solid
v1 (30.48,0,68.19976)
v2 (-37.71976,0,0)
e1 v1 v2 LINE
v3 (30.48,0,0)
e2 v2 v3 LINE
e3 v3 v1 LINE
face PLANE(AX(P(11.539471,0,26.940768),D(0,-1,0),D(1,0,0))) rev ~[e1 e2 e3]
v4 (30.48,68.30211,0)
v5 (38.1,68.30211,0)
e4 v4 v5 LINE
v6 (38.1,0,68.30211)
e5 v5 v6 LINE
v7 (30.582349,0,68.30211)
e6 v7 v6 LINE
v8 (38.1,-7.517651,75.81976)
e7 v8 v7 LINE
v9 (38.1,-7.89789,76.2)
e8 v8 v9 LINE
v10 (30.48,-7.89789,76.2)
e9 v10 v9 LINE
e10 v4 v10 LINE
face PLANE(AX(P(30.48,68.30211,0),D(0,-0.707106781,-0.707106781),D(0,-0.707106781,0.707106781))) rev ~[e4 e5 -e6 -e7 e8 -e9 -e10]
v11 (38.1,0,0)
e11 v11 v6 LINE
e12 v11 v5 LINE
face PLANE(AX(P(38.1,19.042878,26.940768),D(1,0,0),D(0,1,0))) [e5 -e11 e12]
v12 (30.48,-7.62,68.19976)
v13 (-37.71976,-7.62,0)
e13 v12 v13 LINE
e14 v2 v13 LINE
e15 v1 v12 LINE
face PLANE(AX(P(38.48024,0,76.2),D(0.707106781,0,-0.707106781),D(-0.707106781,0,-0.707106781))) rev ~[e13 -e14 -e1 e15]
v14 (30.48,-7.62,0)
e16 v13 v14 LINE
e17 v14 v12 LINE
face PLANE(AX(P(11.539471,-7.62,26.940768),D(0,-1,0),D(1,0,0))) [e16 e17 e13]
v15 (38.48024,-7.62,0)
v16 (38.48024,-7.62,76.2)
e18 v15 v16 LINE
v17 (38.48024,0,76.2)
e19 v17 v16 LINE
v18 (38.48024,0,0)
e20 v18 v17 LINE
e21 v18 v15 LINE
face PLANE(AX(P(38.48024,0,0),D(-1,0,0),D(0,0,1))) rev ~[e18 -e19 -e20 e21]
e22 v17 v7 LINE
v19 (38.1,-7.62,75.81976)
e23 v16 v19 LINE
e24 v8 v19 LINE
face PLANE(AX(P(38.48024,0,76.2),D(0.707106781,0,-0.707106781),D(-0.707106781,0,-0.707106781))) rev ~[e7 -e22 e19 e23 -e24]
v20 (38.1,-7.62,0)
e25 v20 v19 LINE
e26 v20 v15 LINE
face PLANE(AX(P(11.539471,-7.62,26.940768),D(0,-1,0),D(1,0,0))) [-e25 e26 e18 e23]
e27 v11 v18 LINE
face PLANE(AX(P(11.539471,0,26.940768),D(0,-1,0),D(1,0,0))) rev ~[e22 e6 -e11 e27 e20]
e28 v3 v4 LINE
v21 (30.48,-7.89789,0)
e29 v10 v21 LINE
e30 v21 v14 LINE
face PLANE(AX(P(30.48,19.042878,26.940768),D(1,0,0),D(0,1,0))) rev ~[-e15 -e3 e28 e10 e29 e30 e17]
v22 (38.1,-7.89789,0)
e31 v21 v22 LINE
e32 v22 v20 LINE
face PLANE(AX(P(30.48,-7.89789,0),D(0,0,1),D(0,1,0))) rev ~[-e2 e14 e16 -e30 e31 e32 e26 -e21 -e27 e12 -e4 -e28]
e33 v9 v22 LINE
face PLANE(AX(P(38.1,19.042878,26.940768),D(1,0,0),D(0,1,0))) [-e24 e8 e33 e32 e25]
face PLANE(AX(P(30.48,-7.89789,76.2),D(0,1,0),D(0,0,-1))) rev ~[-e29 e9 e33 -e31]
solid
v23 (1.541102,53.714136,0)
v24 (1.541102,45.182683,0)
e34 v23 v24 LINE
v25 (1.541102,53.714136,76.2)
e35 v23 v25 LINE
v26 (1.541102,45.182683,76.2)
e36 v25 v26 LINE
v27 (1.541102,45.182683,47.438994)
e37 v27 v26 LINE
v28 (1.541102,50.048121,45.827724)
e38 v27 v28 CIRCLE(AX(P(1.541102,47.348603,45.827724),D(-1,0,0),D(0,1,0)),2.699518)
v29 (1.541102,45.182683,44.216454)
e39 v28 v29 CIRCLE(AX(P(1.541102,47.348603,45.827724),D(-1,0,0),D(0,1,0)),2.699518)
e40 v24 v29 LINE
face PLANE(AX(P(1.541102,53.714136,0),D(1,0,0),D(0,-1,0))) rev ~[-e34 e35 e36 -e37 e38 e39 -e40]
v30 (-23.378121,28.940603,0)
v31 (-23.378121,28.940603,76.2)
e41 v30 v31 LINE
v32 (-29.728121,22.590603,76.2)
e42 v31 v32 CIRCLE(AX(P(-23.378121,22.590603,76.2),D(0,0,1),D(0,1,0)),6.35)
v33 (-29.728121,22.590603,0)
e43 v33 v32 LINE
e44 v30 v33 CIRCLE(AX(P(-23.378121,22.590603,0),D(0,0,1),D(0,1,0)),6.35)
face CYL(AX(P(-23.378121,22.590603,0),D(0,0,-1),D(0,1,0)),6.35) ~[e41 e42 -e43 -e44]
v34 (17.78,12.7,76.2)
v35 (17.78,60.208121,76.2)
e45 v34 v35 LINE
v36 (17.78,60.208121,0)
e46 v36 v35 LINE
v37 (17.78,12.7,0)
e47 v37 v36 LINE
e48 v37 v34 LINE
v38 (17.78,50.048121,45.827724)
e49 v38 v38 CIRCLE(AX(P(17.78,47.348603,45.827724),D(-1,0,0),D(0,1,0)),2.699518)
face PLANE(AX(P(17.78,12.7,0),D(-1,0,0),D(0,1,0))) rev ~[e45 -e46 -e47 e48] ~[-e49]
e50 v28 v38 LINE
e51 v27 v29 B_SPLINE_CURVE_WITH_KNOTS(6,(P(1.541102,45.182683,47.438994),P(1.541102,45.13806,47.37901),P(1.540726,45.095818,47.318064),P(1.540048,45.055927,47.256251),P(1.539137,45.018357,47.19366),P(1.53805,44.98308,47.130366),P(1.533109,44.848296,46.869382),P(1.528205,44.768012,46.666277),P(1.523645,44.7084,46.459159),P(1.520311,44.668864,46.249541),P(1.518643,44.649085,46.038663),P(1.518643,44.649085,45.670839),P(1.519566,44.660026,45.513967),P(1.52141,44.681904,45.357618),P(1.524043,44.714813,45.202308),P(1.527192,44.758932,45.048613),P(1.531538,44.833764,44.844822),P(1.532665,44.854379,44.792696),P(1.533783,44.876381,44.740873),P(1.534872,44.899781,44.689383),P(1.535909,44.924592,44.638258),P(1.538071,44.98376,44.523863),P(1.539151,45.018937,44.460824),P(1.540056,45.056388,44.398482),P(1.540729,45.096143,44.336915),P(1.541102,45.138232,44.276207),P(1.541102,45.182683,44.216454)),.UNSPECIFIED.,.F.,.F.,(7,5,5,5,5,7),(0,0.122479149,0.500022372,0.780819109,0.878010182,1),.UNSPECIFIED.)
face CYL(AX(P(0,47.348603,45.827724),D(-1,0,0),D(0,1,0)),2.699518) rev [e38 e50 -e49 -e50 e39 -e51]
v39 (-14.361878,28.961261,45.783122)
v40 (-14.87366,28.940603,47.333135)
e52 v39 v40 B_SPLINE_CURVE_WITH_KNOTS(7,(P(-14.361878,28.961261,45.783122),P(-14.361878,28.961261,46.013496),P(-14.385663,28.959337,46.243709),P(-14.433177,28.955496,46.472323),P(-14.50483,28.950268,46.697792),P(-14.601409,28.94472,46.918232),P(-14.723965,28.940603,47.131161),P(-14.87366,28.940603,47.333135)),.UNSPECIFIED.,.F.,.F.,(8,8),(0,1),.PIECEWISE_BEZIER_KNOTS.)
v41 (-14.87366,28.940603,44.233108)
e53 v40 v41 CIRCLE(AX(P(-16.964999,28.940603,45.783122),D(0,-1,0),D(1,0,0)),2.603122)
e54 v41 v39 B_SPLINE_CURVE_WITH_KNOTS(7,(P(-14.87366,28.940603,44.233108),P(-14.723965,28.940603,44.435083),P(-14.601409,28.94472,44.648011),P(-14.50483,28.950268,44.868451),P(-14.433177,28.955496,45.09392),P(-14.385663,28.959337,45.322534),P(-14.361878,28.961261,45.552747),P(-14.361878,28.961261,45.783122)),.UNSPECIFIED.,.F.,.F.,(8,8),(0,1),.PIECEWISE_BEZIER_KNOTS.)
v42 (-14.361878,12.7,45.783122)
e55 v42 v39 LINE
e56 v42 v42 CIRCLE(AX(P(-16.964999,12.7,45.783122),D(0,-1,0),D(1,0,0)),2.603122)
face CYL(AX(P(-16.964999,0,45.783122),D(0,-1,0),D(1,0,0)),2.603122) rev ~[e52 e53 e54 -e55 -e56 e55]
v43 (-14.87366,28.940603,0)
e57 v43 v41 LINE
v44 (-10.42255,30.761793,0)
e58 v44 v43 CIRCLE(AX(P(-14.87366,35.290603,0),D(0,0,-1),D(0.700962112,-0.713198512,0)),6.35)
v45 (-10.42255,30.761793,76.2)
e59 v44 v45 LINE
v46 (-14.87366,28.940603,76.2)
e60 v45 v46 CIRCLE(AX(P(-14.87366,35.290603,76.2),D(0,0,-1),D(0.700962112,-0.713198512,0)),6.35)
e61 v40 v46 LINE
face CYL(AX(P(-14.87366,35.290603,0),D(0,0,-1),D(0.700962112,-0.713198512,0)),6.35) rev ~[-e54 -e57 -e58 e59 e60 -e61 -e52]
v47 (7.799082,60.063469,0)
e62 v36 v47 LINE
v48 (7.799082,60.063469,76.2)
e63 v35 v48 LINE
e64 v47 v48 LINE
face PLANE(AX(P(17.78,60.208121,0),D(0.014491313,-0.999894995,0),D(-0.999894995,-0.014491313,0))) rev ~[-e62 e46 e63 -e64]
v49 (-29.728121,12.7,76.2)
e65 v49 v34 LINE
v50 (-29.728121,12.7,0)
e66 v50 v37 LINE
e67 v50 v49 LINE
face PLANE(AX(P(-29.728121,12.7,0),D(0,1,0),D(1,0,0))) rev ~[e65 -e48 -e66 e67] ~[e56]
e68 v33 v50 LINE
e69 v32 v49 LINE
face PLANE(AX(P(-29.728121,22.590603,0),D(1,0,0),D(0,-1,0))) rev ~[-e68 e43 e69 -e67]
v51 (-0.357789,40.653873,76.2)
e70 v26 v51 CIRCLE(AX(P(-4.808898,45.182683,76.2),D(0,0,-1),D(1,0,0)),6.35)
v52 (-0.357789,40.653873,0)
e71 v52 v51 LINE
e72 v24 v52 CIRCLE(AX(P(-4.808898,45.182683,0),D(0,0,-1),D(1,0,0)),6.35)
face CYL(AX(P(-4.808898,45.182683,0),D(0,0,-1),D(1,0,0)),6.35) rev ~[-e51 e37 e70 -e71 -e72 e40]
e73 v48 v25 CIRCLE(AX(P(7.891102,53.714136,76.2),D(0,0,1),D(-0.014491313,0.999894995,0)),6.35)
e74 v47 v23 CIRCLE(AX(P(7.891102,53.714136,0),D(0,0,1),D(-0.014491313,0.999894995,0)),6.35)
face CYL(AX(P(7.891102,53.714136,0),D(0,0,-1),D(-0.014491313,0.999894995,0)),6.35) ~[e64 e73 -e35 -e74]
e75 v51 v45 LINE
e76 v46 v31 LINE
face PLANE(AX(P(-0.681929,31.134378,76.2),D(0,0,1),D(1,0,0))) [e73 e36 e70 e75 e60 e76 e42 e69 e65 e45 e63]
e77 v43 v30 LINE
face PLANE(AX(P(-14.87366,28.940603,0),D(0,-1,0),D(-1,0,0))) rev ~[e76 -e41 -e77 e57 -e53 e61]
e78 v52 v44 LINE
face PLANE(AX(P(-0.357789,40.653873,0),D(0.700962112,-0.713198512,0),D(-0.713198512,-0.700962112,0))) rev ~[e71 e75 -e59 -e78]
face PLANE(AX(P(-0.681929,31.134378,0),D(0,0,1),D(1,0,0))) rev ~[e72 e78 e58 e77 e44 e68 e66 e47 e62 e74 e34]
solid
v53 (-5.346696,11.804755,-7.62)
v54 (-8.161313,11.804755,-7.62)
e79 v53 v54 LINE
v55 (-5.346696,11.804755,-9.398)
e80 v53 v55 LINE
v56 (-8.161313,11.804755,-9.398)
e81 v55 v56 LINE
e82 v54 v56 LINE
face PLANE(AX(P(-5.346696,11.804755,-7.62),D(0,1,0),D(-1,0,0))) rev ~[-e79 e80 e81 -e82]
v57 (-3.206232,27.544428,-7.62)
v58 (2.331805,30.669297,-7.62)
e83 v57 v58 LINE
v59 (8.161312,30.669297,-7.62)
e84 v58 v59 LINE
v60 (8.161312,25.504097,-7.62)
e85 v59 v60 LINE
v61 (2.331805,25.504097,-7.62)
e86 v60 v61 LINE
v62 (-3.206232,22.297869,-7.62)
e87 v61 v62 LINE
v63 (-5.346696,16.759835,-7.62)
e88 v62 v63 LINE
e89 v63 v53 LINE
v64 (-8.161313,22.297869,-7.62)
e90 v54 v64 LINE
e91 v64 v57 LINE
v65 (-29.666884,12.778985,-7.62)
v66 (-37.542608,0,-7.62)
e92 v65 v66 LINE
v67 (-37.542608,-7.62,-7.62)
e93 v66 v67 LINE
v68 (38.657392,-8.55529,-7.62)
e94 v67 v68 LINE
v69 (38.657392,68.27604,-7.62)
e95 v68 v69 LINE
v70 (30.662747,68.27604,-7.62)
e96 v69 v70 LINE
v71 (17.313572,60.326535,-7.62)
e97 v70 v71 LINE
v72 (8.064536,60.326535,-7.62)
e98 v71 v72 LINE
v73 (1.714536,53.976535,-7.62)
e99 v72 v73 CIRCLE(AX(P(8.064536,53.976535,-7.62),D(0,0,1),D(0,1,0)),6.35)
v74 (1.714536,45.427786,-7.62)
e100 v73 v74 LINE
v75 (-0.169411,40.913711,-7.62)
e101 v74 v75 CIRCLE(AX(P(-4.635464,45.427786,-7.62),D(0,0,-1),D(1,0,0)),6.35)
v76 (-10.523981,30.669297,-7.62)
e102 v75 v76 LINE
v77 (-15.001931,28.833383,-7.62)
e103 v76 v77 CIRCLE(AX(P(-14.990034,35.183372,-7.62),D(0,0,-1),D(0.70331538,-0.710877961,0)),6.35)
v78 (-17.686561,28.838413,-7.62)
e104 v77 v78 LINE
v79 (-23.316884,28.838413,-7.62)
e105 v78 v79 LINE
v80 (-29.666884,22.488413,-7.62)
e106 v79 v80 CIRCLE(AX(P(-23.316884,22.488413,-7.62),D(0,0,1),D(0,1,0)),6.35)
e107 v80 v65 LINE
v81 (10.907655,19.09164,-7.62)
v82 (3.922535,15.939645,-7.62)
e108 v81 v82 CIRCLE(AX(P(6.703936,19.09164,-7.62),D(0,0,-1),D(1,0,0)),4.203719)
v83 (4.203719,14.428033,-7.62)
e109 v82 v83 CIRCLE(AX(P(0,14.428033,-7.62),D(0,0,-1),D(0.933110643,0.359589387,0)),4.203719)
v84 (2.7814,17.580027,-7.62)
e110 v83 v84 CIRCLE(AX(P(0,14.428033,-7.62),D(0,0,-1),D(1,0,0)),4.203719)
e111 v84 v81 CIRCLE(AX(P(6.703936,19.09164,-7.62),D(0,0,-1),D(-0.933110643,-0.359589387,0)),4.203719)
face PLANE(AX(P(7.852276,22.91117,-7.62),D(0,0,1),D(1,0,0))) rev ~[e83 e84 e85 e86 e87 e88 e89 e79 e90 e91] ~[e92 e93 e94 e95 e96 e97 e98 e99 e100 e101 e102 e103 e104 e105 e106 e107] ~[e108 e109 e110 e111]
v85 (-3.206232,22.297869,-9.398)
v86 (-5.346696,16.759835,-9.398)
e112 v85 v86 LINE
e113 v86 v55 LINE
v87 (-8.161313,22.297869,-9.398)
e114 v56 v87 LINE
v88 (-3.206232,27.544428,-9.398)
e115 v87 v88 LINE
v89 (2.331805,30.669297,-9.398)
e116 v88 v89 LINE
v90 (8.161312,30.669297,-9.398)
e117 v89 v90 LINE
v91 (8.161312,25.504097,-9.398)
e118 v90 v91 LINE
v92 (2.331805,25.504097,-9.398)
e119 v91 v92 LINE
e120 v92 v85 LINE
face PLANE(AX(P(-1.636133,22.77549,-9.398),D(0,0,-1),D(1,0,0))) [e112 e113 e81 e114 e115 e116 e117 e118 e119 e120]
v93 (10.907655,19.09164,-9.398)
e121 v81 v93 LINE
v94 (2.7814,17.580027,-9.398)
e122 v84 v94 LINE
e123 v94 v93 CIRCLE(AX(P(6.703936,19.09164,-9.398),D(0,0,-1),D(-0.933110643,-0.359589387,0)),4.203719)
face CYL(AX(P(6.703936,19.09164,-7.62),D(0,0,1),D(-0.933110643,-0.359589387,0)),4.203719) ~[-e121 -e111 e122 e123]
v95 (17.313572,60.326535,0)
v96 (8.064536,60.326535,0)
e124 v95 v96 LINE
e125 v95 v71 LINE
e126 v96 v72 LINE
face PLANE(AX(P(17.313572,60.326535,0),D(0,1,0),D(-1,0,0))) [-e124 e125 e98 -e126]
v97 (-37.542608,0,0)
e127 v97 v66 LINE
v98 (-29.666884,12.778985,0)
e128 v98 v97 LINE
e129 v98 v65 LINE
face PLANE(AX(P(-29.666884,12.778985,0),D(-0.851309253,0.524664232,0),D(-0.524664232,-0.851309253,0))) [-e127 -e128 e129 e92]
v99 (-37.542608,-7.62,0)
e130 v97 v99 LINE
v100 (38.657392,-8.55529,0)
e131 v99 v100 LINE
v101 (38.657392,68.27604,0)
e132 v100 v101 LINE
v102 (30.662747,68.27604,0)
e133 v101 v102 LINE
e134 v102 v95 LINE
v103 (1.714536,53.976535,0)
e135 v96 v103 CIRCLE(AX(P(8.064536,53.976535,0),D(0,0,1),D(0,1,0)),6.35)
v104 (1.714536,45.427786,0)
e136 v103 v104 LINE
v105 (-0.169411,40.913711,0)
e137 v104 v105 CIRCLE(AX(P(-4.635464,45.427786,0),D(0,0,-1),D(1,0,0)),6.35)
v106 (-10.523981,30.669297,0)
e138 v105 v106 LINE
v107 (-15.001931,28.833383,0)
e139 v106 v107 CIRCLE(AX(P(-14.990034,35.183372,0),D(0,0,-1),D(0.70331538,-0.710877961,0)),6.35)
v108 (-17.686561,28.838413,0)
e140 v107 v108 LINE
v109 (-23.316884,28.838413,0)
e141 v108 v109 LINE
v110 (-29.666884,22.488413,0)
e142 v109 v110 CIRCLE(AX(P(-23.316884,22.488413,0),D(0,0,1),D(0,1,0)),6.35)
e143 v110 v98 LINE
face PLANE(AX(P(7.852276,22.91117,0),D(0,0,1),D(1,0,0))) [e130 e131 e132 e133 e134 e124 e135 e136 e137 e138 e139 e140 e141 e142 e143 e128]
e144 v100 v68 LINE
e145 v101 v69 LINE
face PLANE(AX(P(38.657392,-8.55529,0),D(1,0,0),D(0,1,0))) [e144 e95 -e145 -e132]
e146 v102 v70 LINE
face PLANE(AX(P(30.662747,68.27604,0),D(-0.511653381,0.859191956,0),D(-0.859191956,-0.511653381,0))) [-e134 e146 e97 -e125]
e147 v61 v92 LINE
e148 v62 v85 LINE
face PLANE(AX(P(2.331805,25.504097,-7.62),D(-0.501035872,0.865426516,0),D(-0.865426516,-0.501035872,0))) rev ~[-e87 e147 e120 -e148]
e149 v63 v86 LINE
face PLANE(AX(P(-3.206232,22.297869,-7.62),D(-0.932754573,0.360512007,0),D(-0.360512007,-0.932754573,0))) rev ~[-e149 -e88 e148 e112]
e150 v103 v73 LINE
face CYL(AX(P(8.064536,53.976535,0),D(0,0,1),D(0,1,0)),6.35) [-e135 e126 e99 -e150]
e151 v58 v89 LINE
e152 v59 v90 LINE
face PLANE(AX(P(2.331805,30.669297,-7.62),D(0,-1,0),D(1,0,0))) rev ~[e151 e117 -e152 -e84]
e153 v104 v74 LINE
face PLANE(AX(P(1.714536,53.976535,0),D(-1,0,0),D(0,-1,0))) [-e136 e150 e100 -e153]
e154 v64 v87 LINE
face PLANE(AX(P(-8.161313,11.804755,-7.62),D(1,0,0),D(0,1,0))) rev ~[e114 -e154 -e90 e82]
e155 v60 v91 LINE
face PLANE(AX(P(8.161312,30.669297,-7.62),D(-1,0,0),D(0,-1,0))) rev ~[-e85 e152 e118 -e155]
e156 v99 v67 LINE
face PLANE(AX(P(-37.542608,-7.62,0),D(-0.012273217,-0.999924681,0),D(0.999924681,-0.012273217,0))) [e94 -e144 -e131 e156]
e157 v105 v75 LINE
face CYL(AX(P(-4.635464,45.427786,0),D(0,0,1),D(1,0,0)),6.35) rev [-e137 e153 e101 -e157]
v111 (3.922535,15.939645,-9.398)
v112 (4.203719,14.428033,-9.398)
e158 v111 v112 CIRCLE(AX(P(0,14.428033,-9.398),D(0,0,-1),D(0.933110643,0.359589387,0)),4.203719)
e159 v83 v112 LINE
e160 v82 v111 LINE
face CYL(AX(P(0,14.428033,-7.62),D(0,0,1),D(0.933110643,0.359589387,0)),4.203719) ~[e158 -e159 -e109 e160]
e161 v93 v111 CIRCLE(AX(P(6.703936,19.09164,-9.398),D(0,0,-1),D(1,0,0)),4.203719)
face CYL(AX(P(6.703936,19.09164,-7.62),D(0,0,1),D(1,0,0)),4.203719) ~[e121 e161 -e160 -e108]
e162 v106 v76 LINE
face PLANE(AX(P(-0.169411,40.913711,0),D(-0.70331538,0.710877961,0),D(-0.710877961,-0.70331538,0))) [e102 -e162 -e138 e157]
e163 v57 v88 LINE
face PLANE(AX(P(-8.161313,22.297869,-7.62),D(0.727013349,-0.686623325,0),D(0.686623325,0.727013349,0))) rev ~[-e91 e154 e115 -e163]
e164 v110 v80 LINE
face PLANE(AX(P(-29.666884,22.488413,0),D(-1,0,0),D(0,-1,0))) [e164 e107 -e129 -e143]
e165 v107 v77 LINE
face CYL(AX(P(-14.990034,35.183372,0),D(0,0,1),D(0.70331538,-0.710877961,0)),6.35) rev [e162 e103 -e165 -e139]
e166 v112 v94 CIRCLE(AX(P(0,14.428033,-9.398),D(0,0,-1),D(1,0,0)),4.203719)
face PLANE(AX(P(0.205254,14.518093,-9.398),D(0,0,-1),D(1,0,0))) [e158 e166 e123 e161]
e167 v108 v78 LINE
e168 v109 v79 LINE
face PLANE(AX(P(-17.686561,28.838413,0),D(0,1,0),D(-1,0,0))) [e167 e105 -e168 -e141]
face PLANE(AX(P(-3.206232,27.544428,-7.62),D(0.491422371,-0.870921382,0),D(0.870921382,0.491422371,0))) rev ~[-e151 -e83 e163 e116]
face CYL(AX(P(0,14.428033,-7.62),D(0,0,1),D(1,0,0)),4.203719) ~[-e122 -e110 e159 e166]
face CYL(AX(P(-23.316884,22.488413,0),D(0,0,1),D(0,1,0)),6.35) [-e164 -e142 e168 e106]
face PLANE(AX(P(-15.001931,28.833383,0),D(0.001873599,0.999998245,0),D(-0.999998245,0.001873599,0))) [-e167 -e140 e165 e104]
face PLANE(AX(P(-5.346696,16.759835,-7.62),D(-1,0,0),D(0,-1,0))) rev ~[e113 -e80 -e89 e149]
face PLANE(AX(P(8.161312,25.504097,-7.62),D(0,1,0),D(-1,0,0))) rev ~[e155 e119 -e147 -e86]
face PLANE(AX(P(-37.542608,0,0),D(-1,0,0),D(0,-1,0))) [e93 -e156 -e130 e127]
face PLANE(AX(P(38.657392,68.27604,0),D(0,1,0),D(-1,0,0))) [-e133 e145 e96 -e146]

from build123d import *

# Parameters (mm, degrees)
F1_DEPTH       = 7.62
F3_START       = 30.48
F3_DEPTH       = 7.62
F5_DEPTH       = 76.2
F7_DEPTH       = 7.62
F8_R           = 2.6031217073
F9_DEPTH       = 98.806
F10_R          = 2.6995181892
F11_DEPTH      = 47.752
F11_DEPTH_BACK = 45.212
F13_DEPTH      = 1.778


# Not quite as in the source:
# - a feature names something its author has since deleted; it is built from what else it names


with BuildPart() as f1:
    # F0 (on Front) → F1 (new body)
    with BuildSketch(Plane.XZ):
        Polygon((38.4802398158, 76.2), (-37.7197601842, 0), (38.4802398158, 0), align=None)
    extrude(amount=F1_DEPTH)

    # F2 (on Right) → F3 (join)
    with BuildSketch(Plane.YZ.offset(F3_START)):
        Polygon((68.3021095197, 0), (-7.8978904803, 76.2), (-7.8978904803, 0), align=None)
    extrude(amount=F3_DEPTH)


with BuildPart() as f5:
    # F4 (on Top) → F5 (new body)
    with BuildSketch(Plane.XY):
        with BuildLine():
            Line((17.78, 12.7), (17.78, 60.2081210786))
            Line((17.78, 60.2081210786), (7.7990821899, 60.0634692811))
            ThreePointArc((7.7990821899, 60.0634692811), (3.3685570616, 58.1716114676), (1.5411020302, 53.7141360603))
            Line((1.5411020302, 53.7141360603), (1.5411020302, 45.1826832225))
            ThreePointArc((1.5411020302, 45.1826832225), (1.047169173, 42.7272855726), (-0.3577885585, 40.6538726713))
            Line((-0.3577885585, 40.6538726713), (-10.4225503406, 30.7617927566))
            ThreePointArc((-10.4225503406, 30.7617927566), (-12.4690232929, 29.4135101913), (-14.8736597519, 28.9406033078))
            Line((-14.8736597519, 28.9406033078), (-23.3781210786, 28.9406033078))
            ThreePointArc((-23.3781210786, 28.9406033078), (-27.8682491391, 27.0807313683), (-29.7281210786, 22.5906033078))
            Line((-29.7281210786, 22.5906033078), (-29.7281210786, 12.7))
            Line((-29.7281210786, 12.7), (17.78, 12.7))
        make_face()
    extrude(amount=F5_DEPTH)

    # F8 (on Front) → F9 (cut)
    with BuildSketch(Plane.XZ):
        with Locations((-16.9649993712, 45.7831217073)):
            Circle(F8_R)
    extrude(amount=-F9_DEPTH, mode=Mode.SUBTRACT)

    # F10 (on Right) → F11 (cut, two sides)
    with BuildSketch(Plane.YZ) as f11_sk:
        with Locations((47.3486028893, 45.827724101)):
            Circle(F10_R)
    extrude(amount=F11_DEPTH, mode=Mode.SUBTRACT)
    extrude(f11_sk.sketch, amount=-F11_DEPTH_BACK, mode=Mode.SUBTRACT)


with BuildPart() as f7:
    # F6 (on Top) → F7 (new body)
    with BuildSketch(Plane.XY):
        with BuildLine():
            Line((-29.666883871, 22.4884131303), (-29.666883871, 12.7789853141))
            Line((-29.666883871, 12.7789853141), (-37.5426076353, 0))
            Line((-37.5426076353, 0), (-37.5426076353, -7.62))
            Line((-37.5426076353, -7.62), (38.6573923647, -8.5552895431))
            Line((38.6573923647, -8.5552895431), (38.6573923647, 67.6447104569))
            Line((38.6573923647, 67.6447104569), (38.6573923647, 68.276040256))
            Line((38.6573923647, 68.276040256), (30.6627471, 68.276040256))
            Line((30.6627471, 68.276040256), (17.3135716468, 60.3265352547))
            Line((17.3135716468, 60.3265352547), (8.0645363381, 60.3265352547))
            ThreePointArc((8.0645363381, 60.3265352547), (3.5744082776, 58.4666633153), (1.7145363381, 53.9765352547))
            Line((1.7145363381, 53.9765352547), (1.7145363381, 45.4277863735))
            ThreePointArc((1.7145363381, 45.4277863735), (1.2246529933, 42.9820691396), (-0.1694109967, 40.9137113197))
            Line((-0.1694109967, 40.9137113197), (-10.5239810344, 30.6692970018))
            ThreePointArc((-10.5239810344, 30.6692970018), (-12.5811917049, 29.3080014082), (-15.0019310535, 28.8333832011))
            Line((-15.0019310535, 28.8333832011), (-17.6865611632, 28.8384131303))
            Line((-17.6865611632, 28.8384131303), (-23.316883871, 28.8384131303))
            ThreePointArc((-23.316883871, 28.8384131303), (-27.8070119315, 26.9785411909), (-29.666883871, 22.4884131303))
        make_face()
    extrude(amount=-F7_DEPTH)

    # F12 (on face) → F13 (join)
    with BuildSketch(Plane(origin=(0, 0, -7.62), x_dir=(1, 0, 0), z_dir=(0, 0, -1))):
        Polygon((-5.3466960156, -11.8047548458), (-8.1613129005, -11.8047548458), (-8.1613129005, -22.2978685051), (-3.206232097, -27.5444276631), (2.3318054155, -30.6692970018), (8.1613119692, -30.6692970018), (8.1613119692, -25.5040973425), (2.3318054155, -25.5040973425), (-3.206232097, -22.2978685051), (-5.3466960156, -16.7598351836), align=None)
        with BuildLine():
            ThreePointArc((3.9225352044, -15.9396454022), (4.1328254672, -15.1968039625), (4.2037192827, -14.4280325621))
            ThreePointArc((4.2037192827, -14.4280325621), (-3.8316760126, -12.699011237), (2.7814003592, -17.5800268277))
            ThreePointArc((2.7814003592, -17.5800268277), (3.2530804789, -16.6910449513), (3.9225352044, -15.9396454022))
        make_face()
        with BuildLine():
            ThreePointArc((3.9225352044, -15.9396454022), (3.2530804789, -16.6910449513), (2.7814003592, -17.5800268277))
            ThreePointArc((2.7814003592, -17.5800268277), (3.4508550847, -16.8286272786), (3.9225352044, -15.9396454022))
        make_face()
        with BuildLine():
            ThreePointArc((3.9225352044, -15.9396454022), (3.4508550847, -16.8286272786), (2.7814003592, -17.5800268277))
            ThreePointArc((2.7814003592, -17.5800268277), (5.9351641632, -23.2244651349), (10.9076548463, -19.0916396677))
            ThreePointArc((10.9076548463, -19.0916396677), (8.4329568887, -15.2599636552), (3.9225352044, -15.9396454022))
        make_face()
    extrude(amount=F13_DEPTH)


solid = Compound([f1.part, f5.part, f7.part])
